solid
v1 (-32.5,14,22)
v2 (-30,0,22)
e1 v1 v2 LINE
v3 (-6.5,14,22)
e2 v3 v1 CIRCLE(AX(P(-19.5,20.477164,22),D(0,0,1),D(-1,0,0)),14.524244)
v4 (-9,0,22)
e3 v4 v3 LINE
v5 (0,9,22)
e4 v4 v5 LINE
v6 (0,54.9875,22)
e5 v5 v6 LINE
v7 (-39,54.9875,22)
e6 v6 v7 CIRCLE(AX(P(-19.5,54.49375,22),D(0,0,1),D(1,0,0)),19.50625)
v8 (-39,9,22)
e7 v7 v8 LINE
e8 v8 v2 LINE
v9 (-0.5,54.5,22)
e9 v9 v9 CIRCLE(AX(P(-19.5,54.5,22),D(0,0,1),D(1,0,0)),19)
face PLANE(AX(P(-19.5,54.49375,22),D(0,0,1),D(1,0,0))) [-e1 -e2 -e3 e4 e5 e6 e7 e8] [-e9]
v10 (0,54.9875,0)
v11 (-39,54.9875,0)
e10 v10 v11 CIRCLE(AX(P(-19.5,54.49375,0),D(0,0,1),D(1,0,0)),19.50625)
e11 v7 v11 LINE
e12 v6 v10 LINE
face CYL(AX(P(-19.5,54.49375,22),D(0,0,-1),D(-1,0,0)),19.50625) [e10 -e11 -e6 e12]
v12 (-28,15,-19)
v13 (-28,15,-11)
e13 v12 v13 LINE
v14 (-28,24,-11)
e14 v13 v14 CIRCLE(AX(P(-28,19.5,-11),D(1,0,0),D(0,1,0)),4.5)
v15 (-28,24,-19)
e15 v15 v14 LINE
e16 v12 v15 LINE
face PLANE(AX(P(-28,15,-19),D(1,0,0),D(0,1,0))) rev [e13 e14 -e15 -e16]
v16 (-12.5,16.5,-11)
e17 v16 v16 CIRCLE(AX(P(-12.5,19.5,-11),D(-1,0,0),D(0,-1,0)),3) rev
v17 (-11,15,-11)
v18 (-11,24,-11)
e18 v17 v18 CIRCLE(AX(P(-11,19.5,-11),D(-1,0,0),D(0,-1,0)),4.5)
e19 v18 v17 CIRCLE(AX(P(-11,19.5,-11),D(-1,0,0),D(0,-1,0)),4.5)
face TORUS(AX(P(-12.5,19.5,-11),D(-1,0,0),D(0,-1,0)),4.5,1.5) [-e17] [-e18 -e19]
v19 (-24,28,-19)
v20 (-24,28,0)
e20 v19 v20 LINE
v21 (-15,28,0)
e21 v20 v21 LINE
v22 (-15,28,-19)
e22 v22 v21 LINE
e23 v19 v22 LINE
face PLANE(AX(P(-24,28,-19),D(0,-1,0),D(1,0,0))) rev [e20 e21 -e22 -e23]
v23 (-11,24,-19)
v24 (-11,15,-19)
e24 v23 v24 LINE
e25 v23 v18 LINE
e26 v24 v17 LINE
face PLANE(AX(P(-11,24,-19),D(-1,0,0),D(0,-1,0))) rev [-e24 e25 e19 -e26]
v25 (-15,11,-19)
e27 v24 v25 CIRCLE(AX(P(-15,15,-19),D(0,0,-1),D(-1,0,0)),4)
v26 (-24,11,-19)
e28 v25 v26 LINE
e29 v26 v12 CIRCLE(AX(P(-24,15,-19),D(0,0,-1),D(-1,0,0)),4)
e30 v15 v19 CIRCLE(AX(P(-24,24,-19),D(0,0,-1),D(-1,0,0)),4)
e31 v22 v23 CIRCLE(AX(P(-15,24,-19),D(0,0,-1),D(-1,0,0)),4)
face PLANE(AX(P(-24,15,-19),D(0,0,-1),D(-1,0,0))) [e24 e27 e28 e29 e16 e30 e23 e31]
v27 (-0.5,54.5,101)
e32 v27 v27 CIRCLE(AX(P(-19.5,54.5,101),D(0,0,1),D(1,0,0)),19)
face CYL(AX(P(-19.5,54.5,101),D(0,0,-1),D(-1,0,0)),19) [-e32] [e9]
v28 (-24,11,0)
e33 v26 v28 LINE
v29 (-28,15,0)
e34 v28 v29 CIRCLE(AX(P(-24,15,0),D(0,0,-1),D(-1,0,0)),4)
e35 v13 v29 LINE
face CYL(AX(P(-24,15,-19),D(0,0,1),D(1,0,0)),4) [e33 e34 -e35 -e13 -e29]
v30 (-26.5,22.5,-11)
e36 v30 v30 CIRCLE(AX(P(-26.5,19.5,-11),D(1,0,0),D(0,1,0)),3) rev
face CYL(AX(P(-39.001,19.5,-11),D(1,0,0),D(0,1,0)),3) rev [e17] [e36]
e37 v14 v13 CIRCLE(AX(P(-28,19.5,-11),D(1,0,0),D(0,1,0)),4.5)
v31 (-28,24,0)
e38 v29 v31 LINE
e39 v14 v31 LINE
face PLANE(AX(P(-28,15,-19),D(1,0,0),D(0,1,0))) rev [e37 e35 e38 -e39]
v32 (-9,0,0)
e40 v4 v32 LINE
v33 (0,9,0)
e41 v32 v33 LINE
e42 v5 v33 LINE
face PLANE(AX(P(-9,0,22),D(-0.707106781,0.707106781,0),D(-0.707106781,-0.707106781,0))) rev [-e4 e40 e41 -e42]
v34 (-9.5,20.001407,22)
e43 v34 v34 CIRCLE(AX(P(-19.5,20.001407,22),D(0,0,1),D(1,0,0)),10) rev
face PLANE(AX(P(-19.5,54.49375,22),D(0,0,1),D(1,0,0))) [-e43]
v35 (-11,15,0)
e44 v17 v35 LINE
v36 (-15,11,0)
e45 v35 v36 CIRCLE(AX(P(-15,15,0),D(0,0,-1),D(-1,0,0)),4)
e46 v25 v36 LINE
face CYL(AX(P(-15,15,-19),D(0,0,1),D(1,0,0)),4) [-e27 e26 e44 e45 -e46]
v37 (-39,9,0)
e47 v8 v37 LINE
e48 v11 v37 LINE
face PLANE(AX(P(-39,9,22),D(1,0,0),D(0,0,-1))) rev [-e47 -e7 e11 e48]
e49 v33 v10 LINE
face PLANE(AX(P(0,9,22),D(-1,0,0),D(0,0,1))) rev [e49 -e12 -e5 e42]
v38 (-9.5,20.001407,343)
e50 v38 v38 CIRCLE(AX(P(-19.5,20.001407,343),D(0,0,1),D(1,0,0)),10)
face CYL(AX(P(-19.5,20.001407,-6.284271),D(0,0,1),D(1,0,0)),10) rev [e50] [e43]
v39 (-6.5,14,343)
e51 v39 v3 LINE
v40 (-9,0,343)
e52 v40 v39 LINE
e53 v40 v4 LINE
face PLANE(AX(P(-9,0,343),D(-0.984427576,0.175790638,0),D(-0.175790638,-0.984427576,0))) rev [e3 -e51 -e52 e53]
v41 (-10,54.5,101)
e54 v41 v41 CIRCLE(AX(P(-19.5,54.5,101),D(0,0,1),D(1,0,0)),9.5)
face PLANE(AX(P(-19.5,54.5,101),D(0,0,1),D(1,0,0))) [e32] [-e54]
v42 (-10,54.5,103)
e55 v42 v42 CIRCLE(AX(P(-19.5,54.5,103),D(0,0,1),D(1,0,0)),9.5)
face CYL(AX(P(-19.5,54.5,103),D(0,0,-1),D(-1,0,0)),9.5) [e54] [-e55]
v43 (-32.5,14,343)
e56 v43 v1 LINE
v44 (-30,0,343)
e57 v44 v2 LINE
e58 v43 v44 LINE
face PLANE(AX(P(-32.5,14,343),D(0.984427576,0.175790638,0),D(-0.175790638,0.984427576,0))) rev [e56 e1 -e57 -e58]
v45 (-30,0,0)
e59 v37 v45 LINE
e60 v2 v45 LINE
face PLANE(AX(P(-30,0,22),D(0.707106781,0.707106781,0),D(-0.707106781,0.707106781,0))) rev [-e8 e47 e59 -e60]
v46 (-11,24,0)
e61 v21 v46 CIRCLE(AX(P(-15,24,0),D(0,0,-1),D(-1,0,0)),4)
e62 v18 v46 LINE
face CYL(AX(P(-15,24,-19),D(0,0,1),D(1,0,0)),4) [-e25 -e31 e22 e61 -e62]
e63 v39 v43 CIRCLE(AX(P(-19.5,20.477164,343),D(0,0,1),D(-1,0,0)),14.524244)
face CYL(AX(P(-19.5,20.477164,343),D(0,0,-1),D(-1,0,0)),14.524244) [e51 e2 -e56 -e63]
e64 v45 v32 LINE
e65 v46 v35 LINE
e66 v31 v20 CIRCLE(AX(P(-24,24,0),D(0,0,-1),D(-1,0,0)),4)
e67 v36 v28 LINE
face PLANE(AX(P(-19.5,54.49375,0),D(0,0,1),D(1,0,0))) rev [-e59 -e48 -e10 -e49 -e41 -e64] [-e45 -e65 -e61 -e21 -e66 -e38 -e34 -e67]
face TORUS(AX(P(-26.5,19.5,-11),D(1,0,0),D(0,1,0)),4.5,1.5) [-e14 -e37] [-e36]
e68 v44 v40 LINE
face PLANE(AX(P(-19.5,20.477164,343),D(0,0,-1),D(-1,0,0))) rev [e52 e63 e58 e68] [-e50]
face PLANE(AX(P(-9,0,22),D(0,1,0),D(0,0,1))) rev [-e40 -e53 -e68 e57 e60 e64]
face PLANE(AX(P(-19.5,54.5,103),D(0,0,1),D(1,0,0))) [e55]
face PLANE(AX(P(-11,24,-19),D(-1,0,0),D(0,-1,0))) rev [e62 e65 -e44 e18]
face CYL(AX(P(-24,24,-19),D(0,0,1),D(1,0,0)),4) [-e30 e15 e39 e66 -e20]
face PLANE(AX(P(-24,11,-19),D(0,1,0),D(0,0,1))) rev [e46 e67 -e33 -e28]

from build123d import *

# Parameters (mm, degrees)
SALIENTE_EXTRUIR1_DEPTH = 22
CROQUIS2_R              = 19
SALIENTE_EXTRUIR2_DEPTH = 79
CROQUIS3_R              = 9.5
SALIENTE_EXTRUIR3_DEPTH = 2
SALIENTE_EXTRUIR4_DEPTH = 321
CROQUIS5_R              = 10
CORTAR_EXTRUIR1_DEPTH   = 321
SALIENTE_EXTRUIR5_DEPTH = 19
CORTAR_EXTRUIR2_REACH   = 354.007
CROQUIS8_R              = 3
REDONDEO1_R             = 1.5


with BuildPart() as part:
    # Croquis1 → Saliente-Extruir1 (new body)
    with BuildSketch(Plane.XY):
        with BuildLine():
            Line((-9, 0), (-30, 0))
            Line((-30, 0), (-39, 9))
            Line((-39, 9), (-39, 54.9875))
            ThreePointArc((-39, 54.9875), (-19.5, 74), (0, 54.9875))
            Line((0, 54.9875), (0, 9))
            Line((0, 9), (-9, 0))
        make_face()
    extrude(amount=SALIENTE_EXTRUIR1_DEPTH)

    # Croquis2 → Saliente-Extruir2 (add)
    with BuildSketch(Plane.XY.offset(22)):
        with Locations((-19.5, 54.5)):
            Circle(CROQUIS2_R)
    extrude(amount=SALIENTE_EXTRUIR2_DEPTH)

    # Croquis3 → Saliente-Extruir3 (add)
    with BuildSketch(Plane.XY.offset(101)):
        with Locations((-19.5, 54.5)):
            Circle(CROQUIS3_R)
    extrude(amount=SALIENTE_EXTRUIR3_DEPTH)

    # Croquis4 → Saliente-Extruir4 (add)
    with BuildSketch(Plane.XY.offset(22)):
        with BuildLine():
            Line((-32.5, 14), (-30, 0))
            Line((-30, 0), (-9, 0))
            Line((-9, 0), (-6.5, 14))
            ThreePointArc((-6.5, 14), (-19.5, 35.001407257), (-32.5, 14))
        make_face()
    extrude(amount=SALIENTE_EXTRUIR4_DEPTH)

    # Croquis5 → Cortar-Extruir1 (cut)
    with BuildSketch(Plane.XY.offset(343)):
        with Locations((-19.5, 20.001407257)):
            Circle(CROQUIS5_R)
    extrude(amount=-CORTAR_EXTRUIR1_DEPTH, mode=Mode.SUBTRACT)

    # Croquis6 → Saliente-Extruir5 (add)
    with BuildSketch(Plane(origin=(0, 0, 0), x_dir=(-1, 0, 0), z_dir=(0, 0, -1))):
        with BuildLine():
            Line((24, 11), (19.5, 11))
            Line((19.5, 11), (15, 11))
            ThreePointArc((15, 11), (12.171572875, 12.171572875), (11, 15))
            Line((11, 15), (11, 24))
            ThreePointArc((11, 24), (12.171572875, 26.828427125), (15, 28))
            Line((15, 28), (24, 28))
            ThreePointArc((24, 28), (26.828427125, 26.828427125), (28, 24))
            Line((28, 24), (28, 15))
            ThreePointArc((28, 15), (26.828427125, 12.171572875), (24, 11))
        make_face()
    extrude(amount=SALIENTE_EXTRUIR5_DEPTH)

    # Croquis8 → Cortar-Extruir2 (cut, up to next)
    with BuildSketch(Plane(origin=(-11, 0, 0), x_dir=(0, 0, -1), z_dir=(1, 0, 0)), mode=Mode.PRIVATE) as cortar_extruir2_sk1:
        with Locations(Location((11, 19.5, 0), (0, 0, 90))):
            Circle(CROQUIS8_R)
    cortar_extruir2_tool1 = extrude(cortar_extruir2_sk1.sketch, amount=-CORTAR_EXTRUIR2_REACH, mode=Mode.PRIVATE) & part.part
    add(cortar_extruir2_tool1.solids().sort_by_distance((-11, 19.5, -11))[0], mode=Mode.SUBTRACT)

    # Redondeo1
    redondeo1_edges = [part.edges().sort_by_distance(p)[0] for p in [
        (-11, 16.5, -11),
        (-28, 16.5, -11),
    ]]
    fillet(redondeo1_edges, radius=REDONDEO1_R - 0.0001)  # a hair under: the kernel refuses the full size


solid = part.part
